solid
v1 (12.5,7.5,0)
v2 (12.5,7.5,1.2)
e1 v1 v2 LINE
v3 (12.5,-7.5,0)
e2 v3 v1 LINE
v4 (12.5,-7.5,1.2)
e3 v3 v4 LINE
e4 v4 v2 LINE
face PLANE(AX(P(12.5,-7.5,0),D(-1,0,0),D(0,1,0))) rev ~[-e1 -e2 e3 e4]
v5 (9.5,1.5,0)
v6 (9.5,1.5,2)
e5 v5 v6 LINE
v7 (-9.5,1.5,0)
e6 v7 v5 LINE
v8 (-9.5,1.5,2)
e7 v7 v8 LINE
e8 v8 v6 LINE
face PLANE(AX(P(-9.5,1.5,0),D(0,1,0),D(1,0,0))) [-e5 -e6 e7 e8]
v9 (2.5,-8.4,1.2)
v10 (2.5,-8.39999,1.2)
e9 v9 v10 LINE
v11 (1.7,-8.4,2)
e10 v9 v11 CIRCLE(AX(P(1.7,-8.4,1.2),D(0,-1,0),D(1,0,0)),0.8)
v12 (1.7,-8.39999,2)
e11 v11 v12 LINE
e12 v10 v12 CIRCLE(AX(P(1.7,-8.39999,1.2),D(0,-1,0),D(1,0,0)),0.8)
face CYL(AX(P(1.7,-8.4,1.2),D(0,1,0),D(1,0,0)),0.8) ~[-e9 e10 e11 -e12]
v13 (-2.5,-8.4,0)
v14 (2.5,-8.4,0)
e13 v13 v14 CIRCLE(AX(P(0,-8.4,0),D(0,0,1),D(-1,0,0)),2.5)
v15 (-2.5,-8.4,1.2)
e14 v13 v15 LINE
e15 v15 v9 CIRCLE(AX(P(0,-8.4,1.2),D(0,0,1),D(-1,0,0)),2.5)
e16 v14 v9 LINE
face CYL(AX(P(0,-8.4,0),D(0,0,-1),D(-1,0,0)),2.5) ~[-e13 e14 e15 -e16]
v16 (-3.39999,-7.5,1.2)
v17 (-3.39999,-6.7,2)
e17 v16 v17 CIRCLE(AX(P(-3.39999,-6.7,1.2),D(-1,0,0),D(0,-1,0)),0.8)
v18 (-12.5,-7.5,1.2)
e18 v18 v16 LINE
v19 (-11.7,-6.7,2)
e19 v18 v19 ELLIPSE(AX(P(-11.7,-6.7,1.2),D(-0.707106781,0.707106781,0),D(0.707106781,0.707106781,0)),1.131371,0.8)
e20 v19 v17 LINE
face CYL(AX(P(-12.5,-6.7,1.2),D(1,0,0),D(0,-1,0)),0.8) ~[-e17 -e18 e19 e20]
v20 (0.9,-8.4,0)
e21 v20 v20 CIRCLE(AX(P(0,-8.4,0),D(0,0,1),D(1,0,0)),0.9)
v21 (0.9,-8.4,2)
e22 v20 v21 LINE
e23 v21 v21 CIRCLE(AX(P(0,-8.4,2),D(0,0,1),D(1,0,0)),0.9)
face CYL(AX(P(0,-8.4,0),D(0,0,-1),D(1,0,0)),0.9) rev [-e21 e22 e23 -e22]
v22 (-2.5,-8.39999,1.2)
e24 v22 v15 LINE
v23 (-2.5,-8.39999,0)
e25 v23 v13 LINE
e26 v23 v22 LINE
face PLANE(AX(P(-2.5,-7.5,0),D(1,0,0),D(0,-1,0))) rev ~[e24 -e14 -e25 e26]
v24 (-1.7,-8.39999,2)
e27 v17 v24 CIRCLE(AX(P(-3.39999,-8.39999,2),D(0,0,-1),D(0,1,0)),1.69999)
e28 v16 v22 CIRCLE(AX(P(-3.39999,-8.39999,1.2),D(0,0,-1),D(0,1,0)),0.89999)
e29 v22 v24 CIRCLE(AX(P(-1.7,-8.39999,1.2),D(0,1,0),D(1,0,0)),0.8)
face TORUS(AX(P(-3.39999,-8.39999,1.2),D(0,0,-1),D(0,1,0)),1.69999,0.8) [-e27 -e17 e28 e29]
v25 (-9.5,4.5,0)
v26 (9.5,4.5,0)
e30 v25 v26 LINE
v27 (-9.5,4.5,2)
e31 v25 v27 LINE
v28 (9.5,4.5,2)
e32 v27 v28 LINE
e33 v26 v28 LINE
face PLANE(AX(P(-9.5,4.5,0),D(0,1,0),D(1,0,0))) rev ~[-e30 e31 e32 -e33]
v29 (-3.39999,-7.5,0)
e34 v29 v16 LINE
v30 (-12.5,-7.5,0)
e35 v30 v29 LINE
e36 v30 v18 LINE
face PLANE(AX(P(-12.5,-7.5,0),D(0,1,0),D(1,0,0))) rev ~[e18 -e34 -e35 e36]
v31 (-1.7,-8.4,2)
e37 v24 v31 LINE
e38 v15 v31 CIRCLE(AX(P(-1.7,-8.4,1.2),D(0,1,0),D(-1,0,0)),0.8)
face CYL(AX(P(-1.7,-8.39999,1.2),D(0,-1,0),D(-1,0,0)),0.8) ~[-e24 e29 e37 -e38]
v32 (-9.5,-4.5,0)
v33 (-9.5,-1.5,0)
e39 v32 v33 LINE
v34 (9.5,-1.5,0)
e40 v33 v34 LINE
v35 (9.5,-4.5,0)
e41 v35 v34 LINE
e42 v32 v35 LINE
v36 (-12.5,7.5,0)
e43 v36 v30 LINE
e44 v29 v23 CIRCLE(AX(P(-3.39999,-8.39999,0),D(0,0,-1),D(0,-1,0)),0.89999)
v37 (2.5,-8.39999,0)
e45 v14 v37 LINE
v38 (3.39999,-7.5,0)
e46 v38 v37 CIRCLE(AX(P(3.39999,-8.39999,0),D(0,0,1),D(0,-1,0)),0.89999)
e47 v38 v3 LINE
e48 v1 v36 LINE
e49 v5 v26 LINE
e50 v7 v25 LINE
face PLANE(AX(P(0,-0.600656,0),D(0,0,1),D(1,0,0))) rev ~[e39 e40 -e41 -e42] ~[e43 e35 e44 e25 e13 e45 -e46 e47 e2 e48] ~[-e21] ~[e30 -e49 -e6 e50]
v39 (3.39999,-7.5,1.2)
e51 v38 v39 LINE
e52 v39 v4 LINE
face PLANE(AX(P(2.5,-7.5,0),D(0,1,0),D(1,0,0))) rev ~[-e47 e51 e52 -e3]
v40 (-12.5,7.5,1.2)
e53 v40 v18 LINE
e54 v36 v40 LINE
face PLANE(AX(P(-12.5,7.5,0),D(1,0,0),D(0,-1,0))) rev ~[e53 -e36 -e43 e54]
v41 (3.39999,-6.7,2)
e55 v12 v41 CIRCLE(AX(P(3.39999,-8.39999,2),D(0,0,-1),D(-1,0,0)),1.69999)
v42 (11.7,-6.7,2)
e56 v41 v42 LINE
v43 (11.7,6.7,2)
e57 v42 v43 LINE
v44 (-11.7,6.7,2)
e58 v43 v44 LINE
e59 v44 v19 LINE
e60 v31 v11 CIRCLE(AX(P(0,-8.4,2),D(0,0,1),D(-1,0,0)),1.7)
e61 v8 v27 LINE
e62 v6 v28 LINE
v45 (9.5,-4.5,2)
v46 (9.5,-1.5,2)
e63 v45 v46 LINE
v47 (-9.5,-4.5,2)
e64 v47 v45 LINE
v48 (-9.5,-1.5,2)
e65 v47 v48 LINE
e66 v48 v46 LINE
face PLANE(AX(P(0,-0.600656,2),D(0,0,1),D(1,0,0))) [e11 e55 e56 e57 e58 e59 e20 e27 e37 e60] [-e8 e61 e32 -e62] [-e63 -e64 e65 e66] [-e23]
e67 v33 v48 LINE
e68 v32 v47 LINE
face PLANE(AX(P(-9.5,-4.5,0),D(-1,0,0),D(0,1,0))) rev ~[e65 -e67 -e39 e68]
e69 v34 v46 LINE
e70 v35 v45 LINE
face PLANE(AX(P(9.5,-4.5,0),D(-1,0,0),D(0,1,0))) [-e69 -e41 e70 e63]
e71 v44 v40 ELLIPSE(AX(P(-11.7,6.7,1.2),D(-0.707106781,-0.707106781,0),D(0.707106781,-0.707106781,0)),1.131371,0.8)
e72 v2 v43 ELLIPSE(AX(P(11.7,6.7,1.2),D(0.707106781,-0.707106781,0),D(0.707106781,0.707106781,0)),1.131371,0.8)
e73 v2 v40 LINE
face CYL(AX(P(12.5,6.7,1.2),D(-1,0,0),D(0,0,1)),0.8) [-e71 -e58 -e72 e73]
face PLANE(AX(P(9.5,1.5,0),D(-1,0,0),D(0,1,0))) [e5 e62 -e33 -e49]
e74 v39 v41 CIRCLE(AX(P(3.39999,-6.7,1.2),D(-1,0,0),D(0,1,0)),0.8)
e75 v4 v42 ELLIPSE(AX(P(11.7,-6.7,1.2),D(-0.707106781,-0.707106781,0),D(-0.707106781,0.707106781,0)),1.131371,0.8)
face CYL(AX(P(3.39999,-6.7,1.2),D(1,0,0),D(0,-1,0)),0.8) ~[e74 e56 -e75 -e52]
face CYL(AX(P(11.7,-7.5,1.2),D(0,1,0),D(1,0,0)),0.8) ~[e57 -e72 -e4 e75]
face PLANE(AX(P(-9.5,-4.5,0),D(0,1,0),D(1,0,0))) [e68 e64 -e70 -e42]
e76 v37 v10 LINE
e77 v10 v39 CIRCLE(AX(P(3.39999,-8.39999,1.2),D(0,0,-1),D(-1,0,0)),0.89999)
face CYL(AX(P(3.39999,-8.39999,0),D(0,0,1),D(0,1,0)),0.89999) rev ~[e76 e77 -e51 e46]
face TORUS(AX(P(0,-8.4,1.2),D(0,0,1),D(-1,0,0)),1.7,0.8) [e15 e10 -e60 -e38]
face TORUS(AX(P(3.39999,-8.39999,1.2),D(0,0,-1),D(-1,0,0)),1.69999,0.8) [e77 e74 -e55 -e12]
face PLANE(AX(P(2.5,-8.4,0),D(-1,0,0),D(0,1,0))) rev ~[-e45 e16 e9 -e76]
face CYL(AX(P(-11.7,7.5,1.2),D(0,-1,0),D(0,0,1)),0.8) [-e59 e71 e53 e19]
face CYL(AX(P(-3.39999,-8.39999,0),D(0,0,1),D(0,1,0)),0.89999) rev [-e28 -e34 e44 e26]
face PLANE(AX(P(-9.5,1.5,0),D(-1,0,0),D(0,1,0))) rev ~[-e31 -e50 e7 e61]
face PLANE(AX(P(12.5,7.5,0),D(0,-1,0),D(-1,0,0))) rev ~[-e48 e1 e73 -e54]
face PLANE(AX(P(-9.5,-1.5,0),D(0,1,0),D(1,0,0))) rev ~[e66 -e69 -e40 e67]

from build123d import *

# Parameters (mm, degrees)
F0_R     = 0.9
F0_W     = 19
F0_H     = 3
F1_DEPTH = 2
F2_R     = 0.89999
F3_R     = 0.8


# Not quite as in the source:
# - a fillet or chamfer is up to 0.001 mm smaller than in the source, because OpenCascade refuses the exact size


with BuildPart() as f1:
    # F0 (on Top) → F1 (new body)
    with BuildSketch(Plane.XY):
        with BuildLine():
            Line((12.5, 7.5), (-12.5, 7.5))
            Line((-12.5, 7.5), (-12.5, -7.5))
            Line((-12.5, -7.5), (-2.5, -7.5))
            Line((-2.5, -7.5), (-2.5, -8.4))
            ThreePointArc((-2.5, -8.4), (0, -10.9), (2.5, -8.4))
            Line((2.5, -8.4), (2.5, -7.5))
            Line((2.5, -7.5), (12.5, -7.5))
            Line((12.5, -7.5), (12.5, 7.5))
        make_face()
        with Locations((0, -8.4)):
            Circle(F0_R, mode=Mode.SUBTRACT)
        with Locations((0, -3)):
            Rectangle(F0_W, F0_H, mode=Mode.SUBTRACT)
        with Locations((0, 3)):
            Rectangle(F0_W, F0_H, mode=Mode.SUBTRACT)
    extrude(amount=F1_DEPTH)

    # F2 (radius 0.9 in the source; OpenCascade refuses exactly that, so slightly less here)
    f2_edges = [f1.edges().sort_by_distance(p)[0] for p in [
        (2.5, -7.5, 1),
        (-2.5, -7.5, 1),
    ]]
    fillet(f2_edges, radius=F2_R)

    # F3
    f3_edges = [f1.edges().sort_by_distance(p)[0] for p in [
        (12.5, 0, 2),
        (7.949995, -7.5, 2),
        (-12.5, 0, 2),
        (0, 7.5, 2),
    ]]
    fillet(f3_edges, radius=F3_R)


solid = f1.part
